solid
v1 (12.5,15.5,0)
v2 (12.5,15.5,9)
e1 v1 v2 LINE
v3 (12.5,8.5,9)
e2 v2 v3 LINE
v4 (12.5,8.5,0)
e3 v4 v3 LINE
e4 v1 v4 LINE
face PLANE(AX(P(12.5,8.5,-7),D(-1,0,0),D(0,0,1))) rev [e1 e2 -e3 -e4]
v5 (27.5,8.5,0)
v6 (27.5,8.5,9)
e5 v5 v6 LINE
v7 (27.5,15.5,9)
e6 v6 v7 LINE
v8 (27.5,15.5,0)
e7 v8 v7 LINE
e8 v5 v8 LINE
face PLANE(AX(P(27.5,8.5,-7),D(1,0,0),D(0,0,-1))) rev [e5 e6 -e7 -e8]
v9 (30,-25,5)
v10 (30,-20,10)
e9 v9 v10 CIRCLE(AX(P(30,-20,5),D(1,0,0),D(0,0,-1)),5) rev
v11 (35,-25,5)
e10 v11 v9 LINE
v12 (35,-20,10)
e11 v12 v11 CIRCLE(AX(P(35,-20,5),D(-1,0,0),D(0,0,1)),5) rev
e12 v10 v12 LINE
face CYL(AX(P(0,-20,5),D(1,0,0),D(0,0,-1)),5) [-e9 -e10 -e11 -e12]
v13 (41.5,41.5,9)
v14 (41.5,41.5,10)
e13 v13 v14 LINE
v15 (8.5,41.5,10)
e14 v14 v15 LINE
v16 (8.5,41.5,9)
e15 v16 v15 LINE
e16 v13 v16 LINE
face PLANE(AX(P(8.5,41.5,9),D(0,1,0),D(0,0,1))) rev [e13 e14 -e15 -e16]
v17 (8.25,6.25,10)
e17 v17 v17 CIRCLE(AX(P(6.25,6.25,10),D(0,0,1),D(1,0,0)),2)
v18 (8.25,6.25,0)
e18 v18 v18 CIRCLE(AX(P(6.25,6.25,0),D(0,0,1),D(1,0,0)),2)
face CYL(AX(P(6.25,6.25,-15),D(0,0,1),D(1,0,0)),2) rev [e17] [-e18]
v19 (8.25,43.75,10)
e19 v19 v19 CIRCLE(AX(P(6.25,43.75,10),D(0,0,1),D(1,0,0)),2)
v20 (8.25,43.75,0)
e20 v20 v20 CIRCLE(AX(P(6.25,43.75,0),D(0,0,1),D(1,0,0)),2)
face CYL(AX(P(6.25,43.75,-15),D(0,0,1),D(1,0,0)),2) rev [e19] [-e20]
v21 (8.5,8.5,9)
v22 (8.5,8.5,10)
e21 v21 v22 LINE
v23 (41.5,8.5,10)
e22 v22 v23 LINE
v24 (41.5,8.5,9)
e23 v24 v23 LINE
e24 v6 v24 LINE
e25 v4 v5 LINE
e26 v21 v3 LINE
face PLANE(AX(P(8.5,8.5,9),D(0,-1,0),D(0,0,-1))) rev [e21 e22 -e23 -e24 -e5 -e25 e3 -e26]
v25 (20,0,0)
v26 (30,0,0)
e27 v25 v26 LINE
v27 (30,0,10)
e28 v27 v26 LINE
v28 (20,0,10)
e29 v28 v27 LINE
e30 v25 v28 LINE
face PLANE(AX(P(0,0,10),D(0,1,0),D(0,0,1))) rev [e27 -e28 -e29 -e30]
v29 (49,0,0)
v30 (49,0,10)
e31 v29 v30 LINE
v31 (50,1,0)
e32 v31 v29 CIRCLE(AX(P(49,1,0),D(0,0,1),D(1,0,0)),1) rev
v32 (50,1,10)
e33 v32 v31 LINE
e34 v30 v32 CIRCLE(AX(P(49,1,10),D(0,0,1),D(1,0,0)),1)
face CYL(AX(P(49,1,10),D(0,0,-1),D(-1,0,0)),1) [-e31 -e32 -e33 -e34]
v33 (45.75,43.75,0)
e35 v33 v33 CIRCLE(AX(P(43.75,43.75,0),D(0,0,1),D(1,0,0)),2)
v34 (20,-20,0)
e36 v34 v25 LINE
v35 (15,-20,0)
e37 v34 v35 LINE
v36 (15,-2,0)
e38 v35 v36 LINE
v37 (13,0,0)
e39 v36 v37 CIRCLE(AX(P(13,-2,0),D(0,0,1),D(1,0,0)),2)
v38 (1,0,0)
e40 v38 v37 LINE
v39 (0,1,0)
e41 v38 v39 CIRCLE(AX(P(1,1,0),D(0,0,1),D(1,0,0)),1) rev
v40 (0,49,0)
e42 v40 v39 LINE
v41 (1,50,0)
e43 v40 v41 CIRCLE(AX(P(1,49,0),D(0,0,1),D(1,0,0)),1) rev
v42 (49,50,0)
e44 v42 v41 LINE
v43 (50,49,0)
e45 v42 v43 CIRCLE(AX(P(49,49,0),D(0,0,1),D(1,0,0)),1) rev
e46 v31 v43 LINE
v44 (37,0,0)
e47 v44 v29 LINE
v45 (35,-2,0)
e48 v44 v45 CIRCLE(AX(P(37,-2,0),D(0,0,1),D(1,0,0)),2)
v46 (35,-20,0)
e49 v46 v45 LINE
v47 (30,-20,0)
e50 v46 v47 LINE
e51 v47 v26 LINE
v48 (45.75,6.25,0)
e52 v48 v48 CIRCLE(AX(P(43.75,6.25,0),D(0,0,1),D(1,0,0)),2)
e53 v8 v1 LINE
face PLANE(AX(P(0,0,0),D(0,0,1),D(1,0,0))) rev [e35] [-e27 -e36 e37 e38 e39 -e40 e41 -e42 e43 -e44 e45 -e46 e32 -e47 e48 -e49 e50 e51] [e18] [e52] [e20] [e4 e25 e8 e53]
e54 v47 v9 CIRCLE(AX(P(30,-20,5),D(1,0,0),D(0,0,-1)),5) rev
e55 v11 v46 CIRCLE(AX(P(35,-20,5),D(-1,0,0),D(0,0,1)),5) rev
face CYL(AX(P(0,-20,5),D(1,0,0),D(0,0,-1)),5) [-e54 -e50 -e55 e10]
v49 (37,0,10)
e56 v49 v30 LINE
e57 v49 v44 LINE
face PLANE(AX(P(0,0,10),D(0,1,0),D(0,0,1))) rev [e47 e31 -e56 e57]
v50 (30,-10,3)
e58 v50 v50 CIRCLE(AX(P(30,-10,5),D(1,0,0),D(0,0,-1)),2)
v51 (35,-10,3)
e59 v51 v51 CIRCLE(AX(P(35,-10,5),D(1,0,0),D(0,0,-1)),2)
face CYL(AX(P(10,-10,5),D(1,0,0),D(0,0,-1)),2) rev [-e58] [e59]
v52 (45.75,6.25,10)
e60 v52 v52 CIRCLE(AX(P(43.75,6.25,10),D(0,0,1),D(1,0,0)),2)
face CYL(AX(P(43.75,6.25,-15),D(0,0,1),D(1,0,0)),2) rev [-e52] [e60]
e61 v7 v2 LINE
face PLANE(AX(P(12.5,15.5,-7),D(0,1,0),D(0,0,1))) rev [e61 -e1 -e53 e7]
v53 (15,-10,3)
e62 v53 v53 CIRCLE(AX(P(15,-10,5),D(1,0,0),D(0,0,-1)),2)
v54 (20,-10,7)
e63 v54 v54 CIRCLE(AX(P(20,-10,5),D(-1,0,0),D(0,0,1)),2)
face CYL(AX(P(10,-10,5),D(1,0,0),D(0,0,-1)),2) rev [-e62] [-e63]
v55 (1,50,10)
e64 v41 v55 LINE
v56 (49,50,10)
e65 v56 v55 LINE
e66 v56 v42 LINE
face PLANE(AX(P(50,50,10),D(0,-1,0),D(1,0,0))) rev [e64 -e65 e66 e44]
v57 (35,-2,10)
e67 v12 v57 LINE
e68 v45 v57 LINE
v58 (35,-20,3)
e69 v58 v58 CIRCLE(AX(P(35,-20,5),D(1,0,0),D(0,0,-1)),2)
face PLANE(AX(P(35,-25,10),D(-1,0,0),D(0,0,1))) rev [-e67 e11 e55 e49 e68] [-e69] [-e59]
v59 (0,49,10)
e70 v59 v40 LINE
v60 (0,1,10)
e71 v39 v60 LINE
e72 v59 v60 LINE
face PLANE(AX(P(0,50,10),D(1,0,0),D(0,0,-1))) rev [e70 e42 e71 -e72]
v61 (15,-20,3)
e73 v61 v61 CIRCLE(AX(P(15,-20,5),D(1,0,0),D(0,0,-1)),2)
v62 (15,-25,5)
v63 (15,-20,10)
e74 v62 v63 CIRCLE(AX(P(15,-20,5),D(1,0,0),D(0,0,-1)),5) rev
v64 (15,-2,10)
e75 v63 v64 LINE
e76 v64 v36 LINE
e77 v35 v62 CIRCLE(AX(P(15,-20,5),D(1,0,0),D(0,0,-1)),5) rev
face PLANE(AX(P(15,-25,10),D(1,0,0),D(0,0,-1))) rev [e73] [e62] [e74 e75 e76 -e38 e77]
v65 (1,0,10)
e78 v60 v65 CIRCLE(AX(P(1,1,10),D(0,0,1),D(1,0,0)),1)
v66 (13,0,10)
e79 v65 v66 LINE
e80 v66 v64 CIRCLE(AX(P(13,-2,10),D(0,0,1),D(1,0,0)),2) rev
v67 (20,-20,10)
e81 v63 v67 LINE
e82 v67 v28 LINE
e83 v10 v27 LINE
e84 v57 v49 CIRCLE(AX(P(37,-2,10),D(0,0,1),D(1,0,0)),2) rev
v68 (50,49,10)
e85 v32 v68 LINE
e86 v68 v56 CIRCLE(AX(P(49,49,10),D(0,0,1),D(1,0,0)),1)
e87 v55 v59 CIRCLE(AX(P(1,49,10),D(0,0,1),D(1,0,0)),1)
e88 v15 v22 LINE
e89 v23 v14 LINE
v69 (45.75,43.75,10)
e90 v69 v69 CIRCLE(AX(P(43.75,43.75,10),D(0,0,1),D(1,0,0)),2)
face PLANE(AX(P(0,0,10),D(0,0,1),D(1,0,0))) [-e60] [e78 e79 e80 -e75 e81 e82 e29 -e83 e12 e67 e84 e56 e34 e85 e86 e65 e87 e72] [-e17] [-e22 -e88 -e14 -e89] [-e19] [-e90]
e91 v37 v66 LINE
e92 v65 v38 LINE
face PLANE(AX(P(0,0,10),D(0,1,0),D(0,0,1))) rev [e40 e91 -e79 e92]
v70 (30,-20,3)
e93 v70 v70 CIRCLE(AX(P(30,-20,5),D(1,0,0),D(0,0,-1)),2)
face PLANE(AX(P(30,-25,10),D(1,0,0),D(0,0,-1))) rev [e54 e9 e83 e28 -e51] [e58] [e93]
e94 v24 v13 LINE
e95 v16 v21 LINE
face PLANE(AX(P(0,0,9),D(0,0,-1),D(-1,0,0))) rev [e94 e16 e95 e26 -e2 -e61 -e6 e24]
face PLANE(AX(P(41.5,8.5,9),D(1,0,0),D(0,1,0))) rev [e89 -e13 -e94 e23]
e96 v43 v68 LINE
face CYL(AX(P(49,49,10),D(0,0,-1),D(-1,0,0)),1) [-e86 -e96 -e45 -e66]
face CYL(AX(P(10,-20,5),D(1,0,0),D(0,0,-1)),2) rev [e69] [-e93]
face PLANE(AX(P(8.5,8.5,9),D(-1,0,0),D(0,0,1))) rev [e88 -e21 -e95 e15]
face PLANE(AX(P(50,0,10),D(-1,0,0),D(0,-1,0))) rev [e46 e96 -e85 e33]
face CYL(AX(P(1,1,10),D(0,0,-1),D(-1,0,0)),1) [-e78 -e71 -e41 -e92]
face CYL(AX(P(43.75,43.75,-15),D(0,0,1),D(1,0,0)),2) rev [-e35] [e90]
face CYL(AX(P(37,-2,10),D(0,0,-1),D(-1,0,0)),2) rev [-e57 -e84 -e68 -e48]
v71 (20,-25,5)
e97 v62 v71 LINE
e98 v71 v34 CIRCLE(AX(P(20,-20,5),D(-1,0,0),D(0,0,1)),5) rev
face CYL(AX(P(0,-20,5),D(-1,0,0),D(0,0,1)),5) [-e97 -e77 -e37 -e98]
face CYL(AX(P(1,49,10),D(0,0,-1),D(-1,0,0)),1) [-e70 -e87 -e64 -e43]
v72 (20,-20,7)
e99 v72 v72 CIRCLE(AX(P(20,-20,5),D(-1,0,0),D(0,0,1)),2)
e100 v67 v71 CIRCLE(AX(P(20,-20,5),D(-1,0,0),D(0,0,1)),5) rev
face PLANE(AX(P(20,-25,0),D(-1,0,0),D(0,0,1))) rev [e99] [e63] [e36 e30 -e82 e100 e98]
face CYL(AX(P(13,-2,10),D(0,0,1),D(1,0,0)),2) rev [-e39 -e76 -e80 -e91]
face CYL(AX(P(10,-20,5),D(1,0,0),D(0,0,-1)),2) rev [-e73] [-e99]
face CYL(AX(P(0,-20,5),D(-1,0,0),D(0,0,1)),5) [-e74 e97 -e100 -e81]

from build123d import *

# Parameters (mm, degrees)
SKETCH1_W           = 50
SKETCH1_H           = 50
BOSS_EXTRUDE1_DEPTH = 10
SKETCH2_W           = 5
SKETCH2_H           = 10
BOSS_EXTRUDE2_DEPTH = 25
SKETCH3_R           = 2
CUT_EXTRUDE1_DEPTH  = 25
SKETCH4_R           = 2
CUT_EXTRUDE2_DEPTH  = 25
FILLET2_R           = 5
FILLET3_R           = 5
FILLET4_R           = 1
FILLET5_R           = 2
FILLET6_R           = 2
SKETCH5_W           = 33
SKETCH5_H           = 33
CUT_EXTRUDE3_DEPTH  = 1
SKETCH6_W           = 15
SKETCH6_H           = 7
CUT_EXTRUDE4_DEPTH  = 16


with BuildPart() as part:
    # Sketch1 → Boss-Extrude1 (new body)
    with BuildSketch(Plane.XY):
        with Locations((25, 25)):
            Rectangle(SKETCH1_W, SKETCH1_H)
    extrude(amount=BOSS_EXTRUDE1_DEPTH)

    # Sketch2 → Boss-Extrude2 (add)
    with BuildSketch(Plane.XZ):
        with Locations((17.5, 5)):
            Rectangle(SKETCH2_W, SKETCH2_H)
        with Locations((32.5, 5)):
            Rectangle(SKETCH2_W, SKETCH2_H)
    extrude(amount=BOSS_EXTRUDE2_DEPTH)

    # Sketch3 → Cut-Extrude1 (cut)
    with BuildSketch(Plane.XY.offset(10)):
        with Locations((43.75, 43.75)):
            Circle(SKETCH3_R)
        with Locations((6.25, 43.75)):
            Circle(SKETCH3_R)
        with Locations((6.25, 6.25)):
            Circle(SKETCH3_R)
        with Locations((43.75, 6.25)):
            Circle(SKETCH3_R)
    extrude(amount=-CUT_EXTRUDE1_DEPTH, mode=Mode.SUBTRACT)

    # Sketch4 → Cut-Extrude2 (cut)
    with BuildSketch(Plane(origin=(35, 0, 0), x_dir=(0, 0, -1), z_dir=(1, 0, 0))):
        with Locations((-5, -10)):
            Circle(SKETCH4_R)
        with Locations((-5, -20)):
            Circle(SKETCH4_R)
    extrude(amount=-CUT_EXTRUDE2_DEPTH, mode=Mode.SUBTRACT)

    # Fillet2
    fillet2_edges = [part.edges().sort_by_distance(p)[0] for p in [
        (32.5, -25, 10),
    ]]
    fillet(fillet2_edges, radius=FILLET2_R)

    # Fillet3
    fillet3_edges = [part.edges().sort_by_distance(p)[0] for p in [
        (17.5, -25, 10),
        (17.5, -25, 0),
        (32.5, -25, 0),
    ]]
    fillet(fillet3_edges, radius=FILLET3_R - 0.0001)  # a hair under: the kernel refuses the full size

    # Fillet4
    fillet4_edges = [part.edges().sort_by_distance(p)[0] for p in [
        (0, 50, 5),
        (50, 50, 5),
        (50, 0, 5),
        (0, 0, 5),
    ]]
    fillet(fillet4_edges, radius=FILLET4_R)

    # Fillet5
    fillet5_edges = [part.edges().sort_by_distance(p)[0] for p in [
        (15, 0, 5),
    ]]
    fillet(fillet5_edges, radius=FILLET5_R)

    # Fillet6
    fillet6_edges = [part.edges().sort_by_distance(p)[0] for p in [
        (35, 0, 5),
    ]]
    fillet(fillet6_edges, radius=FILLET6_R)

    # Sketch5 → Cut-Extrude3 (cut)
    with BuildSketch(Plane.XY.offset(10)):
        with Locations((25, 25)):
            Rectangle(SKETCH5_W, SKETCH5_H)
    extrude(amount=-CUT_EXTRUDE3_DEPTH, mode=Mode.SUBTRACT)

    # Sketch6 → Cut-Extrude4 (cut)
    with BuildSketch(Plane.XY.offset(9)):
        with Locations((20, 12)):
            Rectangle(SKETCH6_W, SKETCH6_H)
    extrude(amount=-CUT_EXTRUDE4_DEPTH, mode=Mode.SUBTRACT)


solid = part.part
